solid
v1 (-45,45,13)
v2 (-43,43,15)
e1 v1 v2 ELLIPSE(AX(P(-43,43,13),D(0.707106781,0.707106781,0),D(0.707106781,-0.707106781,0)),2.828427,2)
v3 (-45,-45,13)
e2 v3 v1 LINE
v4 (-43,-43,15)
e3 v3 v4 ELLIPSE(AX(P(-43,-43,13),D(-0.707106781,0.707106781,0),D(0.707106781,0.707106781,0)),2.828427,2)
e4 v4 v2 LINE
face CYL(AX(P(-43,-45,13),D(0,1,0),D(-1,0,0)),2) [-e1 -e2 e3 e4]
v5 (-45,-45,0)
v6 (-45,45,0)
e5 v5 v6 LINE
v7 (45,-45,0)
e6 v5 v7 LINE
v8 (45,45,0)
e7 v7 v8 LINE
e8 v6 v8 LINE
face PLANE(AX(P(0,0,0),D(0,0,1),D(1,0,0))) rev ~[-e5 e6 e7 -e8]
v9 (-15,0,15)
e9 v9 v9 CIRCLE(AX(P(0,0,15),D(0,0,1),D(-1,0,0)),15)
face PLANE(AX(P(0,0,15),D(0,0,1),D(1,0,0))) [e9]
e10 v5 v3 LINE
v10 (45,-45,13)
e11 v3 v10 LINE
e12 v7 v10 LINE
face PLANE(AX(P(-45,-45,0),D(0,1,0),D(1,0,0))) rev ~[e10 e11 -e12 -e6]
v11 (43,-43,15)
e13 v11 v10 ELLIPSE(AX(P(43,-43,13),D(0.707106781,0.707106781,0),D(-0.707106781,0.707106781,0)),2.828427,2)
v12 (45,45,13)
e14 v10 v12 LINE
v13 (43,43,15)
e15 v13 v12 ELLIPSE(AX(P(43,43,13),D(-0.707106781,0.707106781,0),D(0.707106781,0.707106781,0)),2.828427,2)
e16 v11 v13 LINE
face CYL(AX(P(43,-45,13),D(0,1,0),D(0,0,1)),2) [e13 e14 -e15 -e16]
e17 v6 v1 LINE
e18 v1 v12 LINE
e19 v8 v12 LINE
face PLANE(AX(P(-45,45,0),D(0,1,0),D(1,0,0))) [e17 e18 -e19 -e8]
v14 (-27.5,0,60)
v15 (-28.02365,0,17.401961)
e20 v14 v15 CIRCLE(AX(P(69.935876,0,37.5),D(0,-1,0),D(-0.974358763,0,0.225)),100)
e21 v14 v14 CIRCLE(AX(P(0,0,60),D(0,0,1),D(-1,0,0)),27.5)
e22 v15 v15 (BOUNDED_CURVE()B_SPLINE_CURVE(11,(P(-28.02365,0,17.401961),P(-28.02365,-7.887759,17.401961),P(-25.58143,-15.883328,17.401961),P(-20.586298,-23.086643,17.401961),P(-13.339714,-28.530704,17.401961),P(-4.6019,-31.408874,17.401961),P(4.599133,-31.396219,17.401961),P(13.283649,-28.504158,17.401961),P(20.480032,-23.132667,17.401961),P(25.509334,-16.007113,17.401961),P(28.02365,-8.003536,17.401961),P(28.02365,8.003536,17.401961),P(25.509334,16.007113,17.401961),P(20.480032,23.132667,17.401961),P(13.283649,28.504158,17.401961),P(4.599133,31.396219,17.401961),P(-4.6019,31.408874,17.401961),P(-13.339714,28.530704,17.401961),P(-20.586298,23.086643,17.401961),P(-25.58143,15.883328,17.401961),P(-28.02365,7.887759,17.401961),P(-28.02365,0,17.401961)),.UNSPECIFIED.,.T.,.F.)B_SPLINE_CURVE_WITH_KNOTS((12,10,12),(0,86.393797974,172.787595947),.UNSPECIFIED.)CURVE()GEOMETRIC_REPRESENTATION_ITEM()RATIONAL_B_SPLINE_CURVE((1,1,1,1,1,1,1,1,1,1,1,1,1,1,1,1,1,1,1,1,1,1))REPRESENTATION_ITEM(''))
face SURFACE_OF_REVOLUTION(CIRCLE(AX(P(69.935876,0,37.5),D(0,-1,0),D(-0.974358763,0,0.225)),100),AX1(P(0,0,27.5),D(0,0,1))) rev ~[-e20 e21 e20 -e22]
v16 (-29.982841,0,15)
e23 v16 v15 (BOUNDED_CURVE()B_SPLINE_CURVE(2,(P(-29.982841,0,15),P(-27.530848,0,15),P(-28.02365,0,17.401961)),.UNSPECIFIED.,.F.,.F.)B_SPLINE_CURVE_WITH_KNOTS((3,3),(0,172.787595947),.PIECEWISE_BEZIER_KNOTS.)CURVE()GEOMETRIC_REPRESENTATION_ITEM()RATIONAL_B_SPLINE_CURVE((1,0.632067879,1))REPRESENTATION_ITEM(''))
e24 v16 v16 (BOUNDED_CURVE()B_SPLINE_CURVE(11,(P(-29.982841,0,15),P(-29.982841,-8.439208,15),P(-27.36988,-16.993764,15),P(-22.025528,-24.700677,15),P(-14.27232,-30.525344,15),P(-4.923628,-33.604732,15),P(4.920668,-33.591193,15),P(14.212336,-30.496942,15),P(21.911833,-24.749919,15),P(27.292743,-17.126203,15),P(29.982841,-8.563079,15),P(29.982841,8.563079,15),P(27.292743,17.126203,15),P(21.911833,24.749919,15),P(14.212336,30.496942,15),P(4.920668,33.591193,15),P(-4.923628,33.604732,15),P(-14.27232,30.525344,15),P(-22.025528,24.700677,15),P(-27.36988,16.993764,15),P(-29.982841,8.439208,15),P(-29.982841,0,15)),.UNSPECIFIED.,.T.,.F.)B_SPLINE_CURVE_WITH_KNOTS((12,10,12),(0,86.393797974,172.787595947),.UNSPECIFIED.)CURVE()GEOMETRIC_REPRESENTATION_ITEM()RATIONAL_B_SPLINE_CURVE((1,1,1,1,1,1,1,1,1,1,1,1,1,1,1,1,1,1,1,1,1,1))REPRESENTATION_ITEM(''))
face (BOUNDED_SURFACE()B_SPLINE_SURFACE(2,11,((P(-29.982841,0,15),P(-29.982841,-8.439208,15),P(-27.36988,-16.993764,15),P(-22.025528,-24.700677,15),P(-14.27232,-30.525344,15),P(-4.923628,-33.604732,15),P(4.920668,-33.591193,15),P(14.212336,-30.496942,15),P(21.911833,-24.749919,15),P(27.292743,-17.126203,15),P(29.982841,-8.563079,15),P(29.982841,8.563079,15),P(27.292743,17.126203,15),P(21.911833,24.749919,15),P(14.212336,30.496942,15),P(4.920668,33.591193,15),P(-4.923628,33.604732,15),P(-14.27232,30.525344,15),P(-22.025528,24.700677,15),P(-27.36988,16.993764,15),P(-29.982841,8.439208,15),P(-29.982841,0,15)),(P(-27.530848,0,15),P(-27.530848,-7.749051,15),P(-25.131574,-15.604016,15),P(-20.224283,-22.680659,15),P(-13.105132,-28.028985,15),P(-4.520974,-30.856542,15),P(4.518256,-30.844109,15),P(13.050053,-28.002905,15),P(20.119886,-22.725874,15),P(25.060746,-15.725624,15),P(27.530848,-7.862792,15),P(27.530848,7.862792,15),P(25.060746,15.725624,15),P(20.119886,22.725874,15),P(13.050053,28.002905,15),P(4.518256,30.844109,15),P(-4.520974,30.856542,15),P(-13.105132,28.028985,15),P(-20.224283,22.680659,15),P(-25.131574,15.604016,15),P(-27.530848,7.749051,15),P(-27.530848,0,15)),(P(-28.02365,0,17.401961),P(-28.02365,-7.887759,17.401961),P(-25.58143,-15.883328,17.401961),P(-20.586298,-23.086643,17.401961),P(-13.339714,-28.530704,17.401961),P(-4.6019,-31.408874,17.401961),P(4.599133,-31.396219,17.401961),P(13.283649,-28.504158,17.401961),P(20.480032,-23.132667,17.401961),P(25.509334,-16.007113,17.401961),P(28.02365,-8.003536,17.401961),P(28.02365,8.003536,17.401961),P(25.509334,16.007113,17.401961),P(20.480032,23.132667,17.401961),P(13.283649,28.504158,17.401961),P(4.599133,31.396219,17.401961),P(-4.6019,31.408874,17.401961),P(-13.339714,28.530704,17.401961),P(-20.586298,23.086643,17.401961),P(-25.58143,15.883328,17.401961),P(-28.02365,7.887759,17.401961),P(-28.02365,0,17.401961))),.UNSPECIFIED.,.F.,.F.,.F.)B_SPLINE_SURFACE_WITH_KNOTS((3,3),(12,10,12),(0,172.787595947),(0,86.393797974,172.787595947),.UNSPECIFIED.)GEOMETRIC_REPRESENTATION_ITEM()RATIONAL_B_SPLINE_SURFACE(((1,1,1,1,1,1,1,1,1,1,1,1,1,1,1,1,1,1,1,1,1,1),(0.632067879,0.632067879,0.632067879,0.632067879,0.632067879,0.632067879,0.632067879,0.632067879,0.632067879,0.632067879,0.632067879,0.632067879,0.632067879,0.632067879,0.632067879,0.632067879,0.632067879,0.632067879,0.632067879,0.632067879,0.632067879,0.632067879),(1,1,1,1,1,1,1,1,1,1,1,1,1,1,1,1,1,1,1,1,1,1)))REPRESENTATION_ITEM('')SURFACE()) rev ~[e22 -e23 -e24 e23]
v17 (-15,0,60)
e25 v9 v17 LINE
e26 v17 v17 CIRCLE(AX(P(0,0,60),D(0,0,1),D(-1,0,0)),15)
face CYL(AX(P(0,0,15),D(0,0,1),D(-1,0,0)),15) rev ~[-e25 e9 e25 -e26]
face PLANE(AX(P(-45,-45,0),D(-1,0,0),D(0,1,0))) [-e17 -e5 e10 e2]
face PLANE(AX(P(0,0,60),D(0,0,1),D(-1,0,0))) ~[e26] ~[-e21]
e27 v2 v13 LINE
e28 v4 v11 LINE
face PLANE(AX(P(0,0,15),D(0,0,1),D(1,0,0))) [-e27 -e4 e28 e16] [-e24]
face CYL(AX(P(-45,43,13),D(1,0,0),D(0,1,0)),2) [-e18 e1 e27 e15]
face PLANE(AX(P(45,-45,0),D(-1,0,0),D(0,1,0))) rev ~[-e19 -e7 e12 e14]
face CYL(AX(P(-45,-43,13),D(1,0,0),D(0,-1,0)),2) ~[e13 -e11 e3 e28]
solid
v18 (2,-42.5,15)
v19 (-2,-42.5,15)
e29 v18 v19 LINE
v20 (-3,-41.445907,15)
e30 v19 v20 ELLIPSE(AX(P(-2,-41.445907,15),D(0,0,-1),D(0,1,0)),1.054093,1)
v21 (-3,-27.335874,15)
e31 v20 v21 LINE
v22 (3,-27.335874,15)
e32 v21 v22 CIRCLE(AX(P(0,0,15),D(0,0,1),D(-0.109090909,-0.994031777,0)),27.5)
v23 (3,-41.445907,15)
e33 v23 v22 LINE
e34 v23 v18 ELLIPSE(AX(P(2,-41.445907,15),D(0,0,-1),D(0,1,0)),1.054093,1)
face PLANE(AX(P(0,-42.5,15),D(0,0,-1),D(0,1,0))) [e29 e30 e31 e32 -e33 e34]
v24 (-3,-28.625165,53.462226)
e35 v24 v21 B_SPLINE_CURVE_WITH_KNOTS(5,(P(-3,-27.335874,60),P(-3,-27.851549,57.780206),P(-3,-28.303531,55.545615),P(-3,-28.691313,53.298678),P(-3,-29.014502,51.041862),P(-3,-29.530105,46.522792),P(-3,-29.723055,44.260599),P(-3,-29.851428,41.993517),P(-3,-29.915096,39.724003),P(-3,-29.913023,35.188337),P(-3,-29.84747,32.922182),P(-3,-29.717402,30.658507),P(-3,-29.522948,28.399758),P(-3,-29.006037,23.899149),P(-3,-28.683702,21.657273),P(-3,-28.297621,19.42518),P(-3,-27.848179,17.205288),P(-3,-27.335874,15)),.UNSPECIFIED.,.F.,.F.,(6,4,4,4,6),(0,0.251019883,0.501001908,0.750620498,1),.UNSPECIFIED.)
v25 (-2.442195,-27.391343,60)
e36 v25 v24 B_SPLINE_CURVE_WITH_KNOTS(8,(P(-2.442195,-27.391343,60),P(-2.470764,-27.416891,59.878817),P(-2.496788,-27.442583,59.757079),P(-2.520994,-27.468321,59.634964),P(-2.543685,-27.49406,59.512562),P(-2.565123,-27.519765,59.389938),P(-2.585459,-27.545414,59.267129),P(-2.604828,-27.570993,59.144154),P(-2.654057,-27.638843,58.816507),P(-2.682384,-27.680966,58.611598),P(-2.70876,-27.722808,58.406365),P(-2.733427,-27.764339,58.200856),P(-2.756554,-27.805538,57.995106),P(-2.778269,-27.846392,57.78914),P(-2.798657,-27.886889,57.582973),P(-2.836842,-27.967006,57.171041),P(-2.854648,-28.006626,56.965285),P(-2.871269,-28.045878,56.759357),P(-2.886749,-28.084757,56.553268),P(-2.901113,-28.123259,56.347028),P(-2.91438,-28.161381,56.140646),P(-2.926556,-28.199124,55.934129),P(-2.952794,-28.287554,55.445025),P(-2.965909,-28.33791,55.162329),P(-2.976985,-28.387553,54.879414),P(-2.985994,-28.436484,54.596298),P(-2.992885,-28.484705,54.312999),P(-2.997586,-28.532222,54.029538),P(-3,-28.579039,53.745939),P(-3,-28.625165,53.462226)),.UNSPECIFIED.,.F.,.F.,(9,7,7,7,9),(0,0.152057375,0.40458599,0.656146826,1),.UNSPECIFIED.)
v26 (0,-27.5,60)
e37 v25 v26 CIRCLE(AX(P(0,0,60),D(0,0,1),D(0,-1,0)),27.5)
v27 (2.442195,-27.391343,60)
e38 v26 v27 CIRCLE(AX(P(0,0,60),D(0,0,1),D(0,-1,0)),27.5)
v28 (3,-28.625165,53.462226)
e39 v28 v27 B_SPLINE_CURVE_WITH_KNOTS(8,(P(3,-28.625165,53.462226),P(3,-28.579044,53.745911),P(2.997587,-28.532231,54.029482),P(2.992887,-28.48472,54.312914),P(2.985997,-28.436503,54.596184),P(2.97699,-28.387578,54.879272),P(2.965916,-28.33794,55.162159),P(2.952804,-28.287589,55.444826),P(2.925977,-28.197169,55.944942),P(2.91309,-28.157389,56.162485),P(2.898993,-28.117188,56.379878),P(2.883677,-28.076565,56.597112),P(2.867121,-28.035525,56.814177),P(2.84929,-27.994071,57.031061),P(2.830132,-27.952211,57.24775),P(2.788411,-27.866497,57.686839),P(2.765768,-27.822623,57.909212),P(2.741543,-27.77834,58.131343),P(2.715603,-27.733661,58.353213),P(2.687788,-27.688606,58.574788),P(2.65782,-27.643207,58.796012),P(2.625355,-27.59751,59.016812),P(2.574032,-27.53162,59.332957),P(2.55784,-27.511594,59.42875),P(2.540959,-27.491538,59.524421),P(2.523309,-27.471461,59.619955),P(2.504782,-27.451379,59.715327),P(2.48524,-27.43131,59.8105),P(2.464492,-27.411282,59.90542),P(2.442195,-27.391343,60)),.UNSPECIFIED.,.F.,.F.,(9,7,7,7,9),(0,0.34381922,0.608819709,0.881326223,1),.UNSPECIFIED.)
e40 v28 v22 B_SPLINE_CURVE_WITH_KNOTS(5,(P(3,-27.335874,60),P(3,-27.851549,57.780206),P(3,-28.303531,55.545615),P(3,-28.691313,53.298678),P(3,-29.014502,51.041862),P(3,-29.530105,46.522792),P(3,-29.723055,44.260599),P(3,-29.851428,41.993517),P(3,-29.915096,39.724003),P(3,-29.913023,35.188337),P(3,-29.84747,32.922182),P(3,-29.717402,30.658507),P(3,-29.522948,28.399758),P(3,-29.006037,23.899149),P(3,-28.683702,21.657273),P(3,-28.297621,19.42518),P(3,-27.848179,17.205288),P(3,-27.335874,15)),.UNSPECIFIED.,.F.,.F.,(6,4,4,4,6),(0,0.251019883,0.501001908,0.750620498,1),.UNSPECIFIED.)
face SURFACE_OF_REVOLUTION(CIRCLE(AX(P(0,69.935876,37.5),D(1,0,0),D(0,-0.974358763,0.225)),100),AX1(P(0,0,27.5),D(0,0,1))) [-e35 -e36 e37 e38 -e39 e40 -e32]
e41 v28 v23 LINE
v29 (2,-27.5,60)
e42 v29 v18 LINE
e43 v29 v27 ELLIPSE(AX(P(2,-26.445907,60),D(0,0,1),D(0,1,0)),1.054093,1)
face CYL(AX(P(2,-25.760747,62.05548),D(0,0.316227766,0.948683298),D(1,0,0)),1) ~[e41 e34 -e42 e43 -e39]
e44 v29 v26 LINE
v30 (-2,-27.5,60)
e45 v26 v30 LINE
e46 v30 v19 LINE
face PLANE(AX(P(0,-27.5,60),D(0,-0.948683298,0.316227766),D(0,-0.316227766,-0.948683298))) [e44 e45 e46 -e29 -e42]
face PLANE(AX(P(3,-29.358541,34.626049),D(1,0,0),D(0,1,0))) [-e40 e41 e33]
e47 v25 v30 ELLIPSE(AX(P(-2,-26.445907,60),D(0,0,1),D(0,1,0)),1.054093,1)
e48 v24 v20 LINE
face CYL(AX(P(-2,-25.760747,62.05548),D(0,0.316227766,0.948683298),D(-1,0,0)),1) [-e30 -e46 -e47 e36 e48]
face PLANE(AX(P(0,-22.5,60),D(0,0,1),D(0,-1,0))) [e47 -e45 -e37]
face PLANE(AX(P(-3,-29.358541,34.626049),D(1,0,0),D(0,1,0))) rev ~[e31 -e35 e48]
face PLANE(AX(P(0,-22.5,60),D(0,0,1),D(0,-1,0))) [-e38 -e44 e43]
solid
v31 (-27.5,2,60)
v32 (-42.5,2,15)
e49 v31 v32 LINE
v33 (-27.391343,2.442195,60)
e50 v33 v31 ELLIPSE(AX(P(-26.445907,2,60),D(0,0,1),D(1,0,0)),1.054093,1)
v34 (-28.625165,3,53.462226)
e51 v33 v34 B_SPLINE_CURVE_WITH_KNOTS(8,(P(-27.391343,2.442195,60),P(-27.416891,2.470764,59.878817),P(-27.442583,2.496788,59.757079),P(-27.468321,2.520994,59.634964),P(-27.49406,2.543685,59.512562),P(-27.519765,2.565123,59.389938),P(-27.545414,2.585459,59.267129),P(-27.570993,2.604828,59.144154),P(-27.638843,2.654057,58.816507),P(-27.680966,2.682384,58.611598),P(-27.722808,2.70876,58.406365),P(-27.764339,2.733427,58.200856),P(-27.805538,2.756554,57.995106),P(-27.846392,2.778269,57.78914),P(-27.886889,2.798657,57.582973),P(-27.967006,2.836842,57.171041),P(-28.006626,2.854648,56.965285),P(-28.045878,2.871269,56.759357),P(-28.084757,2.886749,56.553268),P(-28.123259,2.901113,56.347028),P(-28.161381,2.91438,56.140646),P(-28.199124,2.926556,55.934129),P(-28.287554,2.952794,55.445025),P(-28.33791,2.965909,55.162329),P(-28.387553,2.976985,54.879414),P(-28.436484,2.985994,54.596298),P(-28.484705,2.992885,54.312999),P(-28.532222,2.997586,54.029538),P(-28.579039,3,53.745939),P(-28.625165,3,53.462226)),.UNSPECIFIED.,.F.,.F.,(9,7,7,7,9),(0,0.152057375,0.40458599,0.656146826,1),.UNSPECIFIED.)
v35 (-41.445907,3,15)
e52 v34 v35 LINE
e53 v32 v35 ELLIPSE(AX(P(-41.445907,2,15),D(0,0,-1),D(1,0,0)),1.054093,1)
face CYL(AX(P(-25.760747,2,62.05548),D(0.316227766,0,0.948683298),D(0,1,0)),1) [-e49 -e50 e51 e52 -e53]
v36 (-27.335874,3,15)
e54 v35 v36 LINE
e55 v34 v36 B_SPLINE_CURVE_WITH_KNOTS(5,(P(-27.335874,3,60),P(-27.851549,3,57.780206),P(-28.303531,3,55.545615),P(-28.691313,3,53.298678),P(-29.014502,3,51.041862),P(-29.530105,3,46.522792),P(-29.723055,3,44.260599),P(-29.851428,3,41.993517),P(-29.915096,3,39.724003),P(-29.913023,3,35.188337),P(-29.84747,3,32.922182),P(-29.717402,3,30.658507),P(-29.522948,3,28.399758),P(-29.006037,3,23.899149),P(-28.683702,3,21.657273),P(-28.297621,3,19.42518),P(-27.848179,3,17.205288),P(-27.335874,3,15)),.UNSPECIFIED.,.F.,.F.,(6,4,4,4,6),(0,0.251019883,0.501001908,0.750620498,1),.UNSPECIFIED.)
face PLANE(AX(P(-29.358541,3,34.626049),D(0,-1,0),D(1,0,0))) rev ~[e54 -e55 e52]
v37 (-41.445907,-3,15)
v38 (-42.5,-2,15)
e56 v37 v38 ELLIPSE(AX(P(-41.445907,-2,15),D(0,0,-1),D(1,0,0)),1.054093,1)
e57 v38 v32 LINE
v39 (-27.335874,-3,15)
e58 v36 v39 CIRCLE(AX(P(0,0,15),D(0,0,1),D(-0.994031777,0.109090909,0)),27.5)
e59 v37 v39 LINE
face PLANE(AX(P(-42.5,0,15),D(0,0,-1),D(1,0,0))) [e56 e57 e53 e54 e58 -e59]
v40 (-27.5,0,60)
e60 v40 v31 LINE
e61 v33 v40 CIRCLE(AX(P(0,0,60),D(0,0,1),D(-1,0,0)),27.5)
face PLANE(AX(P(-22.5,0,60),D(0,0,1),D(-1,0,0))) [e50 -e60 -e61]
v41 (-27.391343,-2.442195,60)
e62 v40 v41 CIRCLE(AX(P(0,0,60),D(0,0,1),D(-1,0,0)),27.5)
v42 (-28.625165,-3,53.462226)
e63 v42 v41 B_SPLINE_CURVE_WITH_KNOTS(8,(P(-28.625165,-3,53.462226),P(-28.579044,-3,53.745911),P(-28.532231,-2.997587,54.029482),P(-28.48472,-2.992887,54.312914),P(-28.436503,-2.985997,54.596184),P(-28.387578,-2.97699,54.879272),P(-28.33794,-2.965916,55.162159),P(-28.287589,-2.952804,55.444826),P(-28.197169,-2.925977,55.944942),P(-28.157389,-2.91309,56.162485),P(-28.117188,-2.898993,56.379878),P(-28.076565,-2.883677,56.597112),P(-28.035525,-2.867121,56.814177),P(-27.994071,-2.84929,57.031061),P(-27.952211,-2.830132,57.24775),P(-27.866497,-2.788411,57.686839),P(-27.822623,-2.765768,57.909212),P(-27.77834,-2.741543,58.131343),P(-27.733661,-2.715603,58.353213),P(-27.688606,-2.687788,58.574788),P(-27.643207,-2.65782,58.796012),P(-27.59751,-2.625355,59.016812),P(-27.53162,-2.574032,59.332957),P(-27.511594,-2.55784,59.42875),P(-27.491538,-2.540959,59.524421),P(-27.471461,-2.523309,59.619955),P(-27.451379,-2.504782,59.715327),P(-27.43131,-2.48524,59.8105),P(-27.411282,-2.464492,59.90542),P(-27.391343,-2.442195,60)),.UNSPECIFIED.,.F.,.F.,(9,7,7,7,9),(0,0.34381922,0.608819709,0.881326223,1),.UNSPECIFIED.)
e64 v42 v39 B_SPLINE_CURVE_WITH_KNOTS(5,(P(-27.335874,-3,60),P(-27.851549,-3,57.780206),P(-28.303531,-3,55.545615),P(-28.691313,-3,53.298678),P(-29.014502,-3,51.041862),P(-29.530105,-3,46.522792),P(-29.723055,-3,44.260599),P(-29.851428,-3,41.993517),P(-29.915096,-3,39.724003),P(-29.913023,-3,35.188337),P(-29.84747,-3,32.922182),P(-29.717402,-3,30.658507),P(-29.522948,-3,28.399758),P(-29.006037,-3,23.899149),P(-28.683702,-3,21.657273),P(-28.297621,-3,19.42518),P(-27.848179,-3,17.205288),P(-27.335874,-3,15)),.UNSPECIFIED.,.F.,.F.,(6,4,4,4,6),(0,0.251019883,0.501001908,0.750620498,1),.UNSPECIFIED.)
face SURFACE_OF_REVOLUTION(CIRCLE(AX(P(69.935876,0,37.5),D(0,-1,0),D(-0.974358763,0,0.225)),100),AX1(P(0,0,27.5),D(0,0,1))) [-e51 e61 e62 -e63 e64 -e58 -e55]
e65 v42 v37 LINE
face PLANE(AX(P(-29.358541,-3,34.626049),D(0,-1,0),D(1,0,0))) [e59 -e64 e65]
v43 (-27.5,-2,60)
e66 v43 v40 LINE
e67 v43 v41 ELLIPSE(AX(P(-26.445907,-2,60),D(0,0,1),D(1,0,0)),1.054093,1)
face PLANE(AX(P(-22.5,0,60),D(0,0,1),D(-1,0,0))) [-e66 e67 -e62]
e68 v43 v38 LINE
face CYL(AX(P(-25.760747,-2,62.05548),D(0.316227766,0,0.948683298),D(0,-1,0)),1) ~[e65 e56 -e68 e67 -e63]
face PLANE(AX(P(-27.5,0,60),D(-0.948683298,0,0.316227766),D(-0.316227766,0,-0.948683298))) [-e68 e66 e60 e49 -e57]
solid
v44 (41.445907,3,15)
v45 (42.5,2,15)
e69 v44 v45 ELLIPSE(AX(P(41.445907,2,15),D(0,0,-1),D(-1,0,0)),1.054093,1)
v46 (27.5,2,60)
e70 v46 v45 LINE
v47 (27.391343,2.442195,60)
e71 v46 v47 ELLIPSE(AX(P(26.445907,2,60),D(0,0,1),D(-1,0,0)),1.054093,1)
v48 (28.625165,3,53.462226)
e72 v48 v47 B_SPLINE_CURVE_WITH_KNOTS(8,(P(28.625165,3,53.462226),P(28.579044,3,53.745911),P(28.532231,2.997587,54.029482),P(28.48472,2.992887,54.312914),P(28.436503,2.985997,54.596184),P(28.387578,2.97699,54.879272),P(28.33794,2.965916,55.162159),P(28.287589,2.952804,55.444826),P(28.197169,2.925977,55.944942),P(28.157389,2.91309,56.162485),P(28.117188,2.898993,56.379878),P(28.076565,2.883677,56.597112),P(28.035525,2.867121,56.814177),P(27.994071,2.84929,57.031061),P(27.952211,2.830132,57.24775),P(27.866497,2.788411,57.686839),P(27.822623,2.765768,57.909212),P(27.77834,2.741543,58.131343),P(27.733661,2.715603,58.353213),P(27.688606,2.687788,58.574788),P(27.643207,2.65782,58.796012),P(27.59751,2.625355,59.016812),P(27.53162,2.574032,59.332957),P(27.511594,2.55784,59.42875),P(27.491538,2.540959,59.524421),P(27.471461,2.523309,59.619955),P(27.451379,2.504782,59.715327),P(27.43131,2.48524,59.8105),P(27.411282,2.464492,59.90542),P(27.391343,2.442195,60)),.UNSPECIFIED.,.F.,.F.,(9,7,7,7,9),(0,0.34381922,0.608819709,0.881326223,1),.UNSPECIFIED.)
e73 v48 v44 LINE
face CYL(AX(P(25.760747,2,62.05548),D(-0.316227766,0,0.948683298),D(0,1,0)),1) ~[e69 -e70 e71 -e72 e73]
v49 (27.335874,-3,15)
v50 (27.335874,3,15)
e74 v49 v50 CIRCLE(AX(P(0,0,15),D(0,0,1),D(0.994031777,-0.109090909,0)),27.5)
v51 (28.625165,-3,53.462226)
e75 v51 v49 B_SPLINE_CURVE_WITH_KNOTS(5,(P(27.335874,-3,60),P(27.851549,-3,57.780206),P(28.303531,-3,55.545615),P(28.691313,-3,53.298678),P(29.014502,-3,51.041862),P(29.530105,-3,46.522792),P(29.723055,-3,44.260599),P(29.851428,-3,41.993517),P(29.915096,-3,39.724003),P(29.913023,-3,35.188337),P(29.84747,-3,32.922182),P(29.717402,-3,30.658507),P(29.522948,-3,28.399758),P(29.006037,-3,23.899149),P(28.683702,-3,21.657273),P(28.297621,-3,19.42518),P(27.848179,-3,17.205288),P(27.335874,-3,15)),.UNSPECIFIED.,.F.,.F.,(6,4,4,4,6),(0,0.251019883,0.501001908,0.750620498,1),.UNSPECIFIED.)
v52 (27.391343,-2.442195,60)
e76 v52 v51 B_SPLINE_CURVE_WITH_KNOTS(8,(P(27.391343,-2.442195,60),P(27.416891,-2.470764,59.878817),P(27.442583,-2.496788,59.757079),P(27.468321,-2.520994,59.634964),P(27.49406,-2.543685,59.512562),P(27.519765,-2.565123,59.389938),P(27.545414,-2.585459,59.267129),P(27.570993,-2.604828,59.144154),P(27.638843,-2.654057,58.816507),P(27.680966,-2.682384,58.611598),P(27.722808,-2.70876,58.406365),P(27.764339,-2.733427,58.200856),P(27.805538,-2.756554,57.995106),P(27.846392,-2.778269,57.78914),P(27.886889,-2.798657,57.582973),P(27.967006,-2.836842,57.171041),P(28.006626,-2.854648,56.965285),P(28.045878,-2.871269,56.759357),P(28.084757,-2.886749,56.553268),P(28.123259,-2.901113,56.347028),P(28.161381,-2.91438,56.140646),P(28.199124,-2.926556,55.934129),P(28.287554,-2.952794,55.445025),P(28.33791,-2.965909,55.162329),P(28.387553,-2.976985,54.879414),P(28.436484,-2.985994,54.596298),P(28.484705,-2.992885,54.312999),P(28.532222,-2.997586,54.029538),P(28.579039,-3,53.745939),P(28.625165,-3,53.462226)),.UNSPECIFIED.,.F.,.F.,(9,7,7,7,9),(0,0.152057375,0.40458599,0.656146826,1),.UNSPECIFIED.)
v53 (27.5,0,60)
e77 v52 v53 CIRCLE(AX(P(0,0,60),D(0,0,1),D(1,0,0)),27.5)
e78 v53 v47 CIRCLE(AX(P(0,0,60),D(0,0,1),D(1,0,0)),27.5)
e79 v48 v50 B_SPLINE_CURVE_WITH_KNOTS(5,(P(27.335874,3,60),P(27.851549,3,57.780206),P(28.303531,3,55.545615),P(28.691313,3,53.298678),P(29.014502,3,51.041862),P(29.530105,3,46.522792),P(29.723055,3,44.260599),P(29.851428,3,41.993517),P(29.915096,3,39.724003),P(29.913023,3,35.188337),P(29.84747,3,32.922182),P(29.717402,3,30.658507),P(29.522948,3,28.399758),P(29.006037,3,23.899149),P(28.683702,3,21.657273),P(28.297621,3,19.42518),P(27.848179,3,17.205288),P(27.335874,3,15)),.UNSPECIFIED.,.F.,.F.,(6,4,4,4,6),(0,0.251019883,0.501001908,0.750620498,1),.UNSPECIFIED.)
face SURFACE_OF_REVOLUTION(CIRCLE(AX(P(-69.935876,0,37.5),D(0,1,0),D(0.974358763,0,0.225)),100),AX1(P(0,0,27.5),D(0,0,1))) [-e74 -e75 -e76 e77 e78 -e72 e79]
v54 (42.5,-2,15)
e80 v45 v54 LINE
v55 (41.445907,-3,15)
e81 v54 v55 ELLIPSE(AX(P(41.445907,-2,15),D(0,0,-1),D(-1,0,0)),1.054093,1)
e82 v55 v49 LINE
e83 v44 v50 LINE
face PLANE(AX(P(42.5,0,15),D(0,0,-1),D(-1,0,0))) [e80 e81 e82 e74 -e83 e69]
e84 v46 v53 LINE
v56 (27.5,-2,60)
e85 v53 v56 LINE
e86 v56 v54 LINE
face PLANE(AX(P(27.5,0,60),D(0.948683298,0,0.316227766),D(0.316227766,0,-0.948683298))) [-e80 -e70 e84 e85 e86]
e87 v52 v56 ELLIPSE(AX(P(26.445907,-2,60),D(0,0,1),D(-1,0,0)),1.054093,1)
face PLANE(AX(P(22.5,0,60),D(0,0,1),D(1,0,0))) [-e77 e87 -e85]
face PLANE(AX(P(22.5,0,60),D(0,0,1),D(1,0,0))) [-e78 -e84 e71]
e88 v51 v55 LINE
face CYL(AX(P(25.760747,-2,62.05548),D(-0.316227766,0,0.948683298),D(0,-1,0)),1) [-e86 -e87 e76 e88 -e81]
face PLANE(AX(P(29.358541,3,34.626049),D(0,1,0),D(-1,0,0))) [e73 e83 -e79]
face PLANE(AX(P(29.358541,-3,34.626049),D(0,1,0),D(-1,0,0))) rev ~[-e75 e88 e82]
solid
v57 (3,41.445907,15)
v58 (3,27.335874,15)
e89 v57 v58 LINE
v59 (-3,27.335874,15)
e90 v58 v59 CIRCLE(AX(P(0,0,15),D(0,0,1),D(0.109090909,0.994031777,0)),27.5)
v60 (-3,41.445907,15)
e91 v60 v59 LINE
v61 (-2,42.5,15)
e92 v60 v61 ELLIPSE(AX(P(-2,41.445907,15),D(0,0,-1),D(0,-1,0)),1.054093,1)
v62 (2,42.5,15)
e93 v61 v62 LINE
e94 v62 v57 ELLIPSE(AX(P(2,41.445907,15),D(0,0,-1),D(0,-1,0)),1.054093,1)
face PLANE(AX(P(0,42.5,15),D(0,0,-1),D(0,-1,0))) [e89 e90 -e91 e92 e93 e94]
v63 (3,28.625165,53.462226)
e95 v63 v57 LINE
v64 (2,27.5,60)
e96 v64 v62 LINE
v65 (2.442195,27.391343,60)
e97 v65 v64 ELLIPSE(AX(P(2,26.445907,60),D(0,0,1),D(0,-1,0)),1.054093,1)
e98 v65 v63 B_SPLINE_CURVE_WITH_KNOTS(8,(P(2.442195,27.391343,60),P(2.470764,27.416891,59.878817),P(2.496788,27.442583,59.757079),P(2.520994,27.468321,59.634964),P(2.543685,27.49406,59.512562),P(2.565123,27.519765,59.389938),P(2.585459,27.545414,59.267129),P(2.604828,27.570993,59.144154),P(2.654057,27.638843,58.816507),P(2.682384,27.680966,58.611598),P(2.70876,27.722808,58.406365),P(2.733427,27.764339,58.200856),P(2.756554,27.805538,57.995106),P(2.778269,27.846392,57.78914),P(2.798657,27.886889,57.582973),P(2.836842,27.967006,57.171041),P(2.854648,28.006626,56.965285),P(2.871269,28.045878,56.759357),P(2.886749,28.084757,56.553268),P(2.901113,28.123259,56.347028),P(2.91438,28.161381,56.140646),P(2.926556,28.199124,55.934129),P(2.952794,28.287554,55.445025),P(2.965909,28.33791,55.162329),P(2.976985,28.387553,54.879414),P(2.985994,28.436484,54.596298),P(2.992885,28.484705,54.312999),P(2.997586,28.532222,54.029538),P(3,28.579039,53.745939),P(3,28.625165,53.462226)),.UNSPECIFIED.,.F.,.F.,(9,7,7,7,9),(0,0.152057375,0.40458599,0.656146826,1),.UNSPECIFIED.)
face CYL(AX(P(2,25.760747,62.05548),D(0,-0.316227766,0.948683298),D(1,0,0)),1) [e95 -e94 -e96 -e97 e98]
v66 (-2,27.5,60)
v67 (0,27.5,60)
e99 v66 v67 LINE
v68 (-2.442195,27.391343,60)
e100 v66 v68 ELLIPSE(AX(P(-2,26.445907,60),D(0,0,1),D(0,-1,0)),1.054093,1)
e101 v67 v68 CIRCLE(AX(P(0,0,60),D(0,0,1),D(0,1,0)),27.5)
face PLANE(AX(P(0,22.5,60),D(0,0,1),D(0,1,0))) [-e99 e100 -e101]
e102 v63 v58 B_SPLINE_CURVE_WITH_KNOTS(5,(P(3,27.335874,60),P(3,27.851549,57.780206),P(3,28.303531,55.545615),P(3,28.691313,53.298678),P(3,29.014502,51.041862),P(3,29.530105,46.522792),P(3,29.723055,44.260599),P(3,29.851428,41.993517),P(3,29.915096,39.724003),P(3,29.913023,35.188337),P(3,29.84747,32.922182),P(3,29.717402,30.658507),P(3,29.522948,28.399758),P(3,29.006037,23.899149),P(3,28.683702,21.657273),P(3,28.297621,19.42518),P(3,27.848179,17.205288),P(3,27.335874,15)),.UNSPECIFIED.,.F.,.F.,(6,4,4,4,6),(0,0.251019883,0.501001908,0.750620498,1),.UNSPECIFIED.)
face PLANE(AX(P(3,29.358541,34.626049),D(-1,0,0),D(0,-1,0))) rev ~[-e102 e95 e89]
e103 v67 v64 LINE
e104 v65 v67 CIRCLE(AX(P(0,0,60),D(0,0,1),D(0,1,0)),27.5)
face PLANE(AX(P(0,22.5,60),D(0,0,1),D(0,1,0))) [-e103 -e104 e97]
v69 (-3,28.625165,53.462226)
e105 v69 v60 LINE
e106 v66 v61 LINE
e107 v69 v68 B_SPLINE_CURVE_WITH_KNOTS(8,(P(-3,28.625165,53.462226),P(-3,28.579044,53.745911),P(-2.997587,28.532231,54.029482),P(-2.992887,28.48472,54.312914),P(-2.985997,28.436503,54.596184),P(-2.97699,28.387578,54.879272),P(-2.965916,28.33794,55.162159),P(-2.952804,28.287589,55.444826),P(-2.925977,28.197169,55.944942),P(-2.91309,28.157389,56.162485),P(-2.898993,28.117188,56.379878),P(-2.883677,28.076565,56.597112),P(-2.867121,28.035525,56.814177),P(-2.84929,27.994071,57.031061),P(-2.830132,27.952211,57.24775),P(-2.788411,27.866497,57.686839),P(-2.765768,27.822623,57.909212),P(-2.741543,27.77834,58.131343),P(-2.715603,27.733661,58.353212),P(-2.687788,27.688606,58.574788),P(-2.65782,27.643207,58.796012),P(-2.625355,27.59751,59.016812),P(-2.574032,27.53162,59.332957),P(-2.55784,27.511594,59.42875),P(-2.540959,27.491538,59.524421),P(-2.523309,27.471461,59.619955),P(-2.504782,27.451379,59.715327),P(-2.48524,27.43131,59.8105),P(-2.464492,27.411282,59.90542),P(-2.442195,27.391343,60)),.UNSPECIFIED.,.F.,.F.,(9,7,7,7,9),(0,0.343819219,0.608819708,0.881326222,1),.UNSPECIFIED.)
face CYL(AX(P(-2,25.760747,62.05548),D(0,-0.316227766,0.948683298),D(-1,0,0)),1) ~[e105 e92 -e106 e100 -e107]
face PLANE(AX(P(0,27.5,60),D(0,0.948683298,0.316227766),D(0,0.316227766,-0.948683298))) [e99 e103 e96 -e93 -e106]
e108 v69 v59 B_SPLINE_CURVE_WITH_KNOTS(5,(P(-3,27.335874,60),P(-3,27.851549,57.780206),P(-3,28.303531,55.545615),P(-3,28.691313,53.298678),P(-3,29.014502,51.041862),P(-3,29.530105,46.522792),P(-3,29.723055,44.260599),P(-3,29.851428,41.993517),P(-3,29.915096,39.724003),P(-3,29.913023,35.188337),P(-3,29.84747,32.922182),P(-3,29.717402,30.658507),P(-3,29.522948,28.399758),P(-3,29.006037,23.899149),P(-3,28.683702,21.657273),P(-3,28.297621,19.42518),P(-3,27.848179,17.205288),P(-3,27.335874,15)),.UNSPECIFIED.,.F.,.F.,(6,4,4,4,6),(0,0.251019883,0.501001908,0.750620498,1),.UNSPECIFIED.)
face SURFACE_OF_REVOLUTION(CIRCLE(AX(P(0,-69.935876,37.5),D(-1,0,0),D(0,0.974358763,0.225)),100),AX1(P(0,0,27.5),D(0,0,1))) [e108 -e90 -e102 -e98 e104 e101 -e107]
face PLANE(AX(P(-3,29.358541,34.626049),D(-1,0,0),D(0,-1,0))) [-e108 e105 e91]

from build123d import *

# Parameters (mm, degrees)
F0_W           = 90
F0_H           = 90
F1_DEPTH       = 15
F5_DEPTH       = 3
F7_COUNT       = 4
F8_R           = 2
F9_T1_DEPTH    = 52.4341649025
F10_T1_DEPTH   = 52.4341649025
F10_2_T1_DEPTH = 52.4341649025
F10_3_T1_DEPTH = 52.4341649025


# Not quite as in the source:
# - a fillet or chamfer that OpenCascade refuses, or shapes differently, is made with other operations: its cross-section is extruded or revolved along the edge and cut away or added


with BuildPart() as f1:
    # F0 (on Top) → F1 (new body)
    with BuildSketch(Plane.XY):
        Rectangle(F0_W, F0_H)
    extrude(amount=F1_DEPTH)

    # F2 (on Front) → F3 (revolve)
    with BuildSketch(Plane.XZ):
        with BuildLine():
            Line((-27.5, 15), (-15, 15))
            Line((-15, 15), (-15, 60))
            Line((-15, 60), (-27.5, 60))
            ThreePointArc((-27.5, 60), (-30.0641236505, 37.5), (-27.5, 15))
        make_face()
    revolve(axis=Axis((0, 0, 27.5), (0, 0, 1)))


with BuildPart() as f5:
    # F4 (on Front) → F5 (new body, symmetric)
    with BuildSketch(Plane.XZ):
        Polygon((-42.5, 15), (-22.5, 15), (-22.5, 60), (-27.5, 60), align=None)
    extrude(amount=F5_DEPTH, both=True)

    # F6: cut F1
    add(f1.part, mode=Mode.SUBTRACT)


with BuildPart() as f7_1:
    # F7: instance of F5
    add(f5.part.rotate(Axis((0, 0, 27.5), (0, 0, 1)), 1 * 360 / F7_COUNT))

    # F10#3: fillet of radius 1 on 2 edges, made by hand

    # F10_3_s2 → F10_3_t1 (cut)
    with BuildSketch(Plane(origin=(0, 16.040569415, 48.1217082451), x_dir=(1, 0, 0), z_dir=(0, -0.316227766, -0.9486832981))):
        with BuildLine():
            ThreePointArc((3, 44.0624566574), (2.7071067812, 44.7695634386), (2, 45.0624566574))
            Line((2, 45.0624566574), (3, 45.0624566574))
            Line((3, 45.0624566574), (3, 44.0624566574))
        make_face()
        with BuildLine():
            ThreePointArc((-3, 44.0624566574), (-2.7071067812, 44.7695634386), (-2, 45.0624566574))
            Line((-2, 45.0624566574), (-3, 45.0624566574))
            Line((-3, 45.0624566574), (-3, 44.0624566574))
        make_face()
    extrude(amount=F10_3_T1_DEPTH, mode=Mode.SUBTRACT)


with BuildPart() as f7_2:
    # F7: instance of F5
    add(f5.part.rotate(Axis((0, 0, 27.5), (0, 0, 1)), 2 * 360 / F7_COUNT))

    # F10#2: fillet of radius 1 on 2 edges, made by hand

    # F10_2_s2 → F10_2_t1 (cut)
    with BuildSketch(Plane(origin=(-16.040569415, 0, 48.1217082451), x_dir=(0, 1, 0), z_dir=(0.316227766, 0, -0.9486832981))):
        with BuildLine():
            ThreePointArc((-3, 44.0624566574), (-2.7071067812, 44.7695634386), (-2, 45.0624566574))
            Line((-2, 45.0624566574), (-3, 45.0624566574))
            Line((-3, 45.0624566574), (-3, 44.0624566574))
        make_face()
        with BuildLine():
            ThreePointArc((3, 44.0624566574), (2.7071067812, 44.7695634386), (2, 45.0624566574))
            Line((2, 45.0624566574), (3, 45.0624566574))
            Line((3, 45.0624566574), (3, 44.0624566574))
        make_face()
    extrude(amount=F10_2_T1_DEPTH, mode=Mode.SUBTRACT)


with BuildPart() as f7_3:
    # F7: instance of F5
    add(f5.part.rotate(Axis((0, 0, 27.5), (0, 0, 1)), 3 * 360 / F7_COUNT))

    # F10: fillet of radius 1 on 2 edges, made by hand

    # F10_s2 → F10_t1 (cut)
    with BuildSketch(Plane(origin=(0, -16.040569415, 48.1217082451), x_dir=(1, 0, 0), z_dir=(0, 0.316227766, -0.9486832981))):
        with BuildLine():
            ThreePointArc((-3, -44.0624566574), (-2.7071067812, -44.7695634386), (-2, -45.0624566574))
            Line((-2, -45.0624566574), (-3, -45.0624566574))
            Line((-3, -45.0624566574), (-3, -44.0624566574))
        make_face()
        with BuildLine():
            ThreePointArc((3, -44.0624566574), (2.7071067812, -44.7695634386), (2, -45.0624566574))
            Line((2, -45.0624566574), (3, -45.0624566574))
            Line((3, -45.0624566574), (3, -44.0624566574))
        make_face()
    extrude(amount=F10_T1_DEPTH, mode=Mode.SUBTRACT)


with BuildPart() as f1_1:
    add(f1.part)

    # F8
    f8_edges = [f1_1.edges().sort_by_distance(p)[0] for p in [
        (45, 0, 15),
        (0, -45, 15),
        (0, 45, 15),
        (-45, 0, 15),
        (27.5, 0, 15),
    ]]
    fillet(f8_edges, radius=F8_R)


with BuildPart() as f5_1:
    add(f5.part)

    # F9: fillet of radius 1 on 2 edges, made by hand

    # F9_s2 → F9_t1 (cut)
    with BuildSketch(Plane(origin=(16.040569415, 0, 48.1217082451), x_dir=(0, 1, 0), z_dir=(-0.316227766, 0, -0.9486832981))):
        with BuildLine():
            ThreePointArc((3, -44.0624566574), (2.7071067812, -44.7695634386), (2, -45.0624566574))
            Line((2, -45.0624566574), (3, -45.0624566574))
            Line((3, -45.0624566574), (3, -44.0624566574))
        make_face()
        with BuildLine():
            ThreePointArc((-3, -44.0624566574), (-2.7071067812, -44.7695634386), (-2, -45.0624566574))
            Line((-2, -45.0624566574), (-3, -45.0624566574))
            Line((-3, -45.0624566574), (-3, -44.0624566574))
        make_face()
    extrude(amount=F9_T1_DEPTH, mode=Mode.SUBTRACT)


solid = Compound([f7_1.part, f7_2.part, f7_3.part, f1_1.part, f5_1.part])
